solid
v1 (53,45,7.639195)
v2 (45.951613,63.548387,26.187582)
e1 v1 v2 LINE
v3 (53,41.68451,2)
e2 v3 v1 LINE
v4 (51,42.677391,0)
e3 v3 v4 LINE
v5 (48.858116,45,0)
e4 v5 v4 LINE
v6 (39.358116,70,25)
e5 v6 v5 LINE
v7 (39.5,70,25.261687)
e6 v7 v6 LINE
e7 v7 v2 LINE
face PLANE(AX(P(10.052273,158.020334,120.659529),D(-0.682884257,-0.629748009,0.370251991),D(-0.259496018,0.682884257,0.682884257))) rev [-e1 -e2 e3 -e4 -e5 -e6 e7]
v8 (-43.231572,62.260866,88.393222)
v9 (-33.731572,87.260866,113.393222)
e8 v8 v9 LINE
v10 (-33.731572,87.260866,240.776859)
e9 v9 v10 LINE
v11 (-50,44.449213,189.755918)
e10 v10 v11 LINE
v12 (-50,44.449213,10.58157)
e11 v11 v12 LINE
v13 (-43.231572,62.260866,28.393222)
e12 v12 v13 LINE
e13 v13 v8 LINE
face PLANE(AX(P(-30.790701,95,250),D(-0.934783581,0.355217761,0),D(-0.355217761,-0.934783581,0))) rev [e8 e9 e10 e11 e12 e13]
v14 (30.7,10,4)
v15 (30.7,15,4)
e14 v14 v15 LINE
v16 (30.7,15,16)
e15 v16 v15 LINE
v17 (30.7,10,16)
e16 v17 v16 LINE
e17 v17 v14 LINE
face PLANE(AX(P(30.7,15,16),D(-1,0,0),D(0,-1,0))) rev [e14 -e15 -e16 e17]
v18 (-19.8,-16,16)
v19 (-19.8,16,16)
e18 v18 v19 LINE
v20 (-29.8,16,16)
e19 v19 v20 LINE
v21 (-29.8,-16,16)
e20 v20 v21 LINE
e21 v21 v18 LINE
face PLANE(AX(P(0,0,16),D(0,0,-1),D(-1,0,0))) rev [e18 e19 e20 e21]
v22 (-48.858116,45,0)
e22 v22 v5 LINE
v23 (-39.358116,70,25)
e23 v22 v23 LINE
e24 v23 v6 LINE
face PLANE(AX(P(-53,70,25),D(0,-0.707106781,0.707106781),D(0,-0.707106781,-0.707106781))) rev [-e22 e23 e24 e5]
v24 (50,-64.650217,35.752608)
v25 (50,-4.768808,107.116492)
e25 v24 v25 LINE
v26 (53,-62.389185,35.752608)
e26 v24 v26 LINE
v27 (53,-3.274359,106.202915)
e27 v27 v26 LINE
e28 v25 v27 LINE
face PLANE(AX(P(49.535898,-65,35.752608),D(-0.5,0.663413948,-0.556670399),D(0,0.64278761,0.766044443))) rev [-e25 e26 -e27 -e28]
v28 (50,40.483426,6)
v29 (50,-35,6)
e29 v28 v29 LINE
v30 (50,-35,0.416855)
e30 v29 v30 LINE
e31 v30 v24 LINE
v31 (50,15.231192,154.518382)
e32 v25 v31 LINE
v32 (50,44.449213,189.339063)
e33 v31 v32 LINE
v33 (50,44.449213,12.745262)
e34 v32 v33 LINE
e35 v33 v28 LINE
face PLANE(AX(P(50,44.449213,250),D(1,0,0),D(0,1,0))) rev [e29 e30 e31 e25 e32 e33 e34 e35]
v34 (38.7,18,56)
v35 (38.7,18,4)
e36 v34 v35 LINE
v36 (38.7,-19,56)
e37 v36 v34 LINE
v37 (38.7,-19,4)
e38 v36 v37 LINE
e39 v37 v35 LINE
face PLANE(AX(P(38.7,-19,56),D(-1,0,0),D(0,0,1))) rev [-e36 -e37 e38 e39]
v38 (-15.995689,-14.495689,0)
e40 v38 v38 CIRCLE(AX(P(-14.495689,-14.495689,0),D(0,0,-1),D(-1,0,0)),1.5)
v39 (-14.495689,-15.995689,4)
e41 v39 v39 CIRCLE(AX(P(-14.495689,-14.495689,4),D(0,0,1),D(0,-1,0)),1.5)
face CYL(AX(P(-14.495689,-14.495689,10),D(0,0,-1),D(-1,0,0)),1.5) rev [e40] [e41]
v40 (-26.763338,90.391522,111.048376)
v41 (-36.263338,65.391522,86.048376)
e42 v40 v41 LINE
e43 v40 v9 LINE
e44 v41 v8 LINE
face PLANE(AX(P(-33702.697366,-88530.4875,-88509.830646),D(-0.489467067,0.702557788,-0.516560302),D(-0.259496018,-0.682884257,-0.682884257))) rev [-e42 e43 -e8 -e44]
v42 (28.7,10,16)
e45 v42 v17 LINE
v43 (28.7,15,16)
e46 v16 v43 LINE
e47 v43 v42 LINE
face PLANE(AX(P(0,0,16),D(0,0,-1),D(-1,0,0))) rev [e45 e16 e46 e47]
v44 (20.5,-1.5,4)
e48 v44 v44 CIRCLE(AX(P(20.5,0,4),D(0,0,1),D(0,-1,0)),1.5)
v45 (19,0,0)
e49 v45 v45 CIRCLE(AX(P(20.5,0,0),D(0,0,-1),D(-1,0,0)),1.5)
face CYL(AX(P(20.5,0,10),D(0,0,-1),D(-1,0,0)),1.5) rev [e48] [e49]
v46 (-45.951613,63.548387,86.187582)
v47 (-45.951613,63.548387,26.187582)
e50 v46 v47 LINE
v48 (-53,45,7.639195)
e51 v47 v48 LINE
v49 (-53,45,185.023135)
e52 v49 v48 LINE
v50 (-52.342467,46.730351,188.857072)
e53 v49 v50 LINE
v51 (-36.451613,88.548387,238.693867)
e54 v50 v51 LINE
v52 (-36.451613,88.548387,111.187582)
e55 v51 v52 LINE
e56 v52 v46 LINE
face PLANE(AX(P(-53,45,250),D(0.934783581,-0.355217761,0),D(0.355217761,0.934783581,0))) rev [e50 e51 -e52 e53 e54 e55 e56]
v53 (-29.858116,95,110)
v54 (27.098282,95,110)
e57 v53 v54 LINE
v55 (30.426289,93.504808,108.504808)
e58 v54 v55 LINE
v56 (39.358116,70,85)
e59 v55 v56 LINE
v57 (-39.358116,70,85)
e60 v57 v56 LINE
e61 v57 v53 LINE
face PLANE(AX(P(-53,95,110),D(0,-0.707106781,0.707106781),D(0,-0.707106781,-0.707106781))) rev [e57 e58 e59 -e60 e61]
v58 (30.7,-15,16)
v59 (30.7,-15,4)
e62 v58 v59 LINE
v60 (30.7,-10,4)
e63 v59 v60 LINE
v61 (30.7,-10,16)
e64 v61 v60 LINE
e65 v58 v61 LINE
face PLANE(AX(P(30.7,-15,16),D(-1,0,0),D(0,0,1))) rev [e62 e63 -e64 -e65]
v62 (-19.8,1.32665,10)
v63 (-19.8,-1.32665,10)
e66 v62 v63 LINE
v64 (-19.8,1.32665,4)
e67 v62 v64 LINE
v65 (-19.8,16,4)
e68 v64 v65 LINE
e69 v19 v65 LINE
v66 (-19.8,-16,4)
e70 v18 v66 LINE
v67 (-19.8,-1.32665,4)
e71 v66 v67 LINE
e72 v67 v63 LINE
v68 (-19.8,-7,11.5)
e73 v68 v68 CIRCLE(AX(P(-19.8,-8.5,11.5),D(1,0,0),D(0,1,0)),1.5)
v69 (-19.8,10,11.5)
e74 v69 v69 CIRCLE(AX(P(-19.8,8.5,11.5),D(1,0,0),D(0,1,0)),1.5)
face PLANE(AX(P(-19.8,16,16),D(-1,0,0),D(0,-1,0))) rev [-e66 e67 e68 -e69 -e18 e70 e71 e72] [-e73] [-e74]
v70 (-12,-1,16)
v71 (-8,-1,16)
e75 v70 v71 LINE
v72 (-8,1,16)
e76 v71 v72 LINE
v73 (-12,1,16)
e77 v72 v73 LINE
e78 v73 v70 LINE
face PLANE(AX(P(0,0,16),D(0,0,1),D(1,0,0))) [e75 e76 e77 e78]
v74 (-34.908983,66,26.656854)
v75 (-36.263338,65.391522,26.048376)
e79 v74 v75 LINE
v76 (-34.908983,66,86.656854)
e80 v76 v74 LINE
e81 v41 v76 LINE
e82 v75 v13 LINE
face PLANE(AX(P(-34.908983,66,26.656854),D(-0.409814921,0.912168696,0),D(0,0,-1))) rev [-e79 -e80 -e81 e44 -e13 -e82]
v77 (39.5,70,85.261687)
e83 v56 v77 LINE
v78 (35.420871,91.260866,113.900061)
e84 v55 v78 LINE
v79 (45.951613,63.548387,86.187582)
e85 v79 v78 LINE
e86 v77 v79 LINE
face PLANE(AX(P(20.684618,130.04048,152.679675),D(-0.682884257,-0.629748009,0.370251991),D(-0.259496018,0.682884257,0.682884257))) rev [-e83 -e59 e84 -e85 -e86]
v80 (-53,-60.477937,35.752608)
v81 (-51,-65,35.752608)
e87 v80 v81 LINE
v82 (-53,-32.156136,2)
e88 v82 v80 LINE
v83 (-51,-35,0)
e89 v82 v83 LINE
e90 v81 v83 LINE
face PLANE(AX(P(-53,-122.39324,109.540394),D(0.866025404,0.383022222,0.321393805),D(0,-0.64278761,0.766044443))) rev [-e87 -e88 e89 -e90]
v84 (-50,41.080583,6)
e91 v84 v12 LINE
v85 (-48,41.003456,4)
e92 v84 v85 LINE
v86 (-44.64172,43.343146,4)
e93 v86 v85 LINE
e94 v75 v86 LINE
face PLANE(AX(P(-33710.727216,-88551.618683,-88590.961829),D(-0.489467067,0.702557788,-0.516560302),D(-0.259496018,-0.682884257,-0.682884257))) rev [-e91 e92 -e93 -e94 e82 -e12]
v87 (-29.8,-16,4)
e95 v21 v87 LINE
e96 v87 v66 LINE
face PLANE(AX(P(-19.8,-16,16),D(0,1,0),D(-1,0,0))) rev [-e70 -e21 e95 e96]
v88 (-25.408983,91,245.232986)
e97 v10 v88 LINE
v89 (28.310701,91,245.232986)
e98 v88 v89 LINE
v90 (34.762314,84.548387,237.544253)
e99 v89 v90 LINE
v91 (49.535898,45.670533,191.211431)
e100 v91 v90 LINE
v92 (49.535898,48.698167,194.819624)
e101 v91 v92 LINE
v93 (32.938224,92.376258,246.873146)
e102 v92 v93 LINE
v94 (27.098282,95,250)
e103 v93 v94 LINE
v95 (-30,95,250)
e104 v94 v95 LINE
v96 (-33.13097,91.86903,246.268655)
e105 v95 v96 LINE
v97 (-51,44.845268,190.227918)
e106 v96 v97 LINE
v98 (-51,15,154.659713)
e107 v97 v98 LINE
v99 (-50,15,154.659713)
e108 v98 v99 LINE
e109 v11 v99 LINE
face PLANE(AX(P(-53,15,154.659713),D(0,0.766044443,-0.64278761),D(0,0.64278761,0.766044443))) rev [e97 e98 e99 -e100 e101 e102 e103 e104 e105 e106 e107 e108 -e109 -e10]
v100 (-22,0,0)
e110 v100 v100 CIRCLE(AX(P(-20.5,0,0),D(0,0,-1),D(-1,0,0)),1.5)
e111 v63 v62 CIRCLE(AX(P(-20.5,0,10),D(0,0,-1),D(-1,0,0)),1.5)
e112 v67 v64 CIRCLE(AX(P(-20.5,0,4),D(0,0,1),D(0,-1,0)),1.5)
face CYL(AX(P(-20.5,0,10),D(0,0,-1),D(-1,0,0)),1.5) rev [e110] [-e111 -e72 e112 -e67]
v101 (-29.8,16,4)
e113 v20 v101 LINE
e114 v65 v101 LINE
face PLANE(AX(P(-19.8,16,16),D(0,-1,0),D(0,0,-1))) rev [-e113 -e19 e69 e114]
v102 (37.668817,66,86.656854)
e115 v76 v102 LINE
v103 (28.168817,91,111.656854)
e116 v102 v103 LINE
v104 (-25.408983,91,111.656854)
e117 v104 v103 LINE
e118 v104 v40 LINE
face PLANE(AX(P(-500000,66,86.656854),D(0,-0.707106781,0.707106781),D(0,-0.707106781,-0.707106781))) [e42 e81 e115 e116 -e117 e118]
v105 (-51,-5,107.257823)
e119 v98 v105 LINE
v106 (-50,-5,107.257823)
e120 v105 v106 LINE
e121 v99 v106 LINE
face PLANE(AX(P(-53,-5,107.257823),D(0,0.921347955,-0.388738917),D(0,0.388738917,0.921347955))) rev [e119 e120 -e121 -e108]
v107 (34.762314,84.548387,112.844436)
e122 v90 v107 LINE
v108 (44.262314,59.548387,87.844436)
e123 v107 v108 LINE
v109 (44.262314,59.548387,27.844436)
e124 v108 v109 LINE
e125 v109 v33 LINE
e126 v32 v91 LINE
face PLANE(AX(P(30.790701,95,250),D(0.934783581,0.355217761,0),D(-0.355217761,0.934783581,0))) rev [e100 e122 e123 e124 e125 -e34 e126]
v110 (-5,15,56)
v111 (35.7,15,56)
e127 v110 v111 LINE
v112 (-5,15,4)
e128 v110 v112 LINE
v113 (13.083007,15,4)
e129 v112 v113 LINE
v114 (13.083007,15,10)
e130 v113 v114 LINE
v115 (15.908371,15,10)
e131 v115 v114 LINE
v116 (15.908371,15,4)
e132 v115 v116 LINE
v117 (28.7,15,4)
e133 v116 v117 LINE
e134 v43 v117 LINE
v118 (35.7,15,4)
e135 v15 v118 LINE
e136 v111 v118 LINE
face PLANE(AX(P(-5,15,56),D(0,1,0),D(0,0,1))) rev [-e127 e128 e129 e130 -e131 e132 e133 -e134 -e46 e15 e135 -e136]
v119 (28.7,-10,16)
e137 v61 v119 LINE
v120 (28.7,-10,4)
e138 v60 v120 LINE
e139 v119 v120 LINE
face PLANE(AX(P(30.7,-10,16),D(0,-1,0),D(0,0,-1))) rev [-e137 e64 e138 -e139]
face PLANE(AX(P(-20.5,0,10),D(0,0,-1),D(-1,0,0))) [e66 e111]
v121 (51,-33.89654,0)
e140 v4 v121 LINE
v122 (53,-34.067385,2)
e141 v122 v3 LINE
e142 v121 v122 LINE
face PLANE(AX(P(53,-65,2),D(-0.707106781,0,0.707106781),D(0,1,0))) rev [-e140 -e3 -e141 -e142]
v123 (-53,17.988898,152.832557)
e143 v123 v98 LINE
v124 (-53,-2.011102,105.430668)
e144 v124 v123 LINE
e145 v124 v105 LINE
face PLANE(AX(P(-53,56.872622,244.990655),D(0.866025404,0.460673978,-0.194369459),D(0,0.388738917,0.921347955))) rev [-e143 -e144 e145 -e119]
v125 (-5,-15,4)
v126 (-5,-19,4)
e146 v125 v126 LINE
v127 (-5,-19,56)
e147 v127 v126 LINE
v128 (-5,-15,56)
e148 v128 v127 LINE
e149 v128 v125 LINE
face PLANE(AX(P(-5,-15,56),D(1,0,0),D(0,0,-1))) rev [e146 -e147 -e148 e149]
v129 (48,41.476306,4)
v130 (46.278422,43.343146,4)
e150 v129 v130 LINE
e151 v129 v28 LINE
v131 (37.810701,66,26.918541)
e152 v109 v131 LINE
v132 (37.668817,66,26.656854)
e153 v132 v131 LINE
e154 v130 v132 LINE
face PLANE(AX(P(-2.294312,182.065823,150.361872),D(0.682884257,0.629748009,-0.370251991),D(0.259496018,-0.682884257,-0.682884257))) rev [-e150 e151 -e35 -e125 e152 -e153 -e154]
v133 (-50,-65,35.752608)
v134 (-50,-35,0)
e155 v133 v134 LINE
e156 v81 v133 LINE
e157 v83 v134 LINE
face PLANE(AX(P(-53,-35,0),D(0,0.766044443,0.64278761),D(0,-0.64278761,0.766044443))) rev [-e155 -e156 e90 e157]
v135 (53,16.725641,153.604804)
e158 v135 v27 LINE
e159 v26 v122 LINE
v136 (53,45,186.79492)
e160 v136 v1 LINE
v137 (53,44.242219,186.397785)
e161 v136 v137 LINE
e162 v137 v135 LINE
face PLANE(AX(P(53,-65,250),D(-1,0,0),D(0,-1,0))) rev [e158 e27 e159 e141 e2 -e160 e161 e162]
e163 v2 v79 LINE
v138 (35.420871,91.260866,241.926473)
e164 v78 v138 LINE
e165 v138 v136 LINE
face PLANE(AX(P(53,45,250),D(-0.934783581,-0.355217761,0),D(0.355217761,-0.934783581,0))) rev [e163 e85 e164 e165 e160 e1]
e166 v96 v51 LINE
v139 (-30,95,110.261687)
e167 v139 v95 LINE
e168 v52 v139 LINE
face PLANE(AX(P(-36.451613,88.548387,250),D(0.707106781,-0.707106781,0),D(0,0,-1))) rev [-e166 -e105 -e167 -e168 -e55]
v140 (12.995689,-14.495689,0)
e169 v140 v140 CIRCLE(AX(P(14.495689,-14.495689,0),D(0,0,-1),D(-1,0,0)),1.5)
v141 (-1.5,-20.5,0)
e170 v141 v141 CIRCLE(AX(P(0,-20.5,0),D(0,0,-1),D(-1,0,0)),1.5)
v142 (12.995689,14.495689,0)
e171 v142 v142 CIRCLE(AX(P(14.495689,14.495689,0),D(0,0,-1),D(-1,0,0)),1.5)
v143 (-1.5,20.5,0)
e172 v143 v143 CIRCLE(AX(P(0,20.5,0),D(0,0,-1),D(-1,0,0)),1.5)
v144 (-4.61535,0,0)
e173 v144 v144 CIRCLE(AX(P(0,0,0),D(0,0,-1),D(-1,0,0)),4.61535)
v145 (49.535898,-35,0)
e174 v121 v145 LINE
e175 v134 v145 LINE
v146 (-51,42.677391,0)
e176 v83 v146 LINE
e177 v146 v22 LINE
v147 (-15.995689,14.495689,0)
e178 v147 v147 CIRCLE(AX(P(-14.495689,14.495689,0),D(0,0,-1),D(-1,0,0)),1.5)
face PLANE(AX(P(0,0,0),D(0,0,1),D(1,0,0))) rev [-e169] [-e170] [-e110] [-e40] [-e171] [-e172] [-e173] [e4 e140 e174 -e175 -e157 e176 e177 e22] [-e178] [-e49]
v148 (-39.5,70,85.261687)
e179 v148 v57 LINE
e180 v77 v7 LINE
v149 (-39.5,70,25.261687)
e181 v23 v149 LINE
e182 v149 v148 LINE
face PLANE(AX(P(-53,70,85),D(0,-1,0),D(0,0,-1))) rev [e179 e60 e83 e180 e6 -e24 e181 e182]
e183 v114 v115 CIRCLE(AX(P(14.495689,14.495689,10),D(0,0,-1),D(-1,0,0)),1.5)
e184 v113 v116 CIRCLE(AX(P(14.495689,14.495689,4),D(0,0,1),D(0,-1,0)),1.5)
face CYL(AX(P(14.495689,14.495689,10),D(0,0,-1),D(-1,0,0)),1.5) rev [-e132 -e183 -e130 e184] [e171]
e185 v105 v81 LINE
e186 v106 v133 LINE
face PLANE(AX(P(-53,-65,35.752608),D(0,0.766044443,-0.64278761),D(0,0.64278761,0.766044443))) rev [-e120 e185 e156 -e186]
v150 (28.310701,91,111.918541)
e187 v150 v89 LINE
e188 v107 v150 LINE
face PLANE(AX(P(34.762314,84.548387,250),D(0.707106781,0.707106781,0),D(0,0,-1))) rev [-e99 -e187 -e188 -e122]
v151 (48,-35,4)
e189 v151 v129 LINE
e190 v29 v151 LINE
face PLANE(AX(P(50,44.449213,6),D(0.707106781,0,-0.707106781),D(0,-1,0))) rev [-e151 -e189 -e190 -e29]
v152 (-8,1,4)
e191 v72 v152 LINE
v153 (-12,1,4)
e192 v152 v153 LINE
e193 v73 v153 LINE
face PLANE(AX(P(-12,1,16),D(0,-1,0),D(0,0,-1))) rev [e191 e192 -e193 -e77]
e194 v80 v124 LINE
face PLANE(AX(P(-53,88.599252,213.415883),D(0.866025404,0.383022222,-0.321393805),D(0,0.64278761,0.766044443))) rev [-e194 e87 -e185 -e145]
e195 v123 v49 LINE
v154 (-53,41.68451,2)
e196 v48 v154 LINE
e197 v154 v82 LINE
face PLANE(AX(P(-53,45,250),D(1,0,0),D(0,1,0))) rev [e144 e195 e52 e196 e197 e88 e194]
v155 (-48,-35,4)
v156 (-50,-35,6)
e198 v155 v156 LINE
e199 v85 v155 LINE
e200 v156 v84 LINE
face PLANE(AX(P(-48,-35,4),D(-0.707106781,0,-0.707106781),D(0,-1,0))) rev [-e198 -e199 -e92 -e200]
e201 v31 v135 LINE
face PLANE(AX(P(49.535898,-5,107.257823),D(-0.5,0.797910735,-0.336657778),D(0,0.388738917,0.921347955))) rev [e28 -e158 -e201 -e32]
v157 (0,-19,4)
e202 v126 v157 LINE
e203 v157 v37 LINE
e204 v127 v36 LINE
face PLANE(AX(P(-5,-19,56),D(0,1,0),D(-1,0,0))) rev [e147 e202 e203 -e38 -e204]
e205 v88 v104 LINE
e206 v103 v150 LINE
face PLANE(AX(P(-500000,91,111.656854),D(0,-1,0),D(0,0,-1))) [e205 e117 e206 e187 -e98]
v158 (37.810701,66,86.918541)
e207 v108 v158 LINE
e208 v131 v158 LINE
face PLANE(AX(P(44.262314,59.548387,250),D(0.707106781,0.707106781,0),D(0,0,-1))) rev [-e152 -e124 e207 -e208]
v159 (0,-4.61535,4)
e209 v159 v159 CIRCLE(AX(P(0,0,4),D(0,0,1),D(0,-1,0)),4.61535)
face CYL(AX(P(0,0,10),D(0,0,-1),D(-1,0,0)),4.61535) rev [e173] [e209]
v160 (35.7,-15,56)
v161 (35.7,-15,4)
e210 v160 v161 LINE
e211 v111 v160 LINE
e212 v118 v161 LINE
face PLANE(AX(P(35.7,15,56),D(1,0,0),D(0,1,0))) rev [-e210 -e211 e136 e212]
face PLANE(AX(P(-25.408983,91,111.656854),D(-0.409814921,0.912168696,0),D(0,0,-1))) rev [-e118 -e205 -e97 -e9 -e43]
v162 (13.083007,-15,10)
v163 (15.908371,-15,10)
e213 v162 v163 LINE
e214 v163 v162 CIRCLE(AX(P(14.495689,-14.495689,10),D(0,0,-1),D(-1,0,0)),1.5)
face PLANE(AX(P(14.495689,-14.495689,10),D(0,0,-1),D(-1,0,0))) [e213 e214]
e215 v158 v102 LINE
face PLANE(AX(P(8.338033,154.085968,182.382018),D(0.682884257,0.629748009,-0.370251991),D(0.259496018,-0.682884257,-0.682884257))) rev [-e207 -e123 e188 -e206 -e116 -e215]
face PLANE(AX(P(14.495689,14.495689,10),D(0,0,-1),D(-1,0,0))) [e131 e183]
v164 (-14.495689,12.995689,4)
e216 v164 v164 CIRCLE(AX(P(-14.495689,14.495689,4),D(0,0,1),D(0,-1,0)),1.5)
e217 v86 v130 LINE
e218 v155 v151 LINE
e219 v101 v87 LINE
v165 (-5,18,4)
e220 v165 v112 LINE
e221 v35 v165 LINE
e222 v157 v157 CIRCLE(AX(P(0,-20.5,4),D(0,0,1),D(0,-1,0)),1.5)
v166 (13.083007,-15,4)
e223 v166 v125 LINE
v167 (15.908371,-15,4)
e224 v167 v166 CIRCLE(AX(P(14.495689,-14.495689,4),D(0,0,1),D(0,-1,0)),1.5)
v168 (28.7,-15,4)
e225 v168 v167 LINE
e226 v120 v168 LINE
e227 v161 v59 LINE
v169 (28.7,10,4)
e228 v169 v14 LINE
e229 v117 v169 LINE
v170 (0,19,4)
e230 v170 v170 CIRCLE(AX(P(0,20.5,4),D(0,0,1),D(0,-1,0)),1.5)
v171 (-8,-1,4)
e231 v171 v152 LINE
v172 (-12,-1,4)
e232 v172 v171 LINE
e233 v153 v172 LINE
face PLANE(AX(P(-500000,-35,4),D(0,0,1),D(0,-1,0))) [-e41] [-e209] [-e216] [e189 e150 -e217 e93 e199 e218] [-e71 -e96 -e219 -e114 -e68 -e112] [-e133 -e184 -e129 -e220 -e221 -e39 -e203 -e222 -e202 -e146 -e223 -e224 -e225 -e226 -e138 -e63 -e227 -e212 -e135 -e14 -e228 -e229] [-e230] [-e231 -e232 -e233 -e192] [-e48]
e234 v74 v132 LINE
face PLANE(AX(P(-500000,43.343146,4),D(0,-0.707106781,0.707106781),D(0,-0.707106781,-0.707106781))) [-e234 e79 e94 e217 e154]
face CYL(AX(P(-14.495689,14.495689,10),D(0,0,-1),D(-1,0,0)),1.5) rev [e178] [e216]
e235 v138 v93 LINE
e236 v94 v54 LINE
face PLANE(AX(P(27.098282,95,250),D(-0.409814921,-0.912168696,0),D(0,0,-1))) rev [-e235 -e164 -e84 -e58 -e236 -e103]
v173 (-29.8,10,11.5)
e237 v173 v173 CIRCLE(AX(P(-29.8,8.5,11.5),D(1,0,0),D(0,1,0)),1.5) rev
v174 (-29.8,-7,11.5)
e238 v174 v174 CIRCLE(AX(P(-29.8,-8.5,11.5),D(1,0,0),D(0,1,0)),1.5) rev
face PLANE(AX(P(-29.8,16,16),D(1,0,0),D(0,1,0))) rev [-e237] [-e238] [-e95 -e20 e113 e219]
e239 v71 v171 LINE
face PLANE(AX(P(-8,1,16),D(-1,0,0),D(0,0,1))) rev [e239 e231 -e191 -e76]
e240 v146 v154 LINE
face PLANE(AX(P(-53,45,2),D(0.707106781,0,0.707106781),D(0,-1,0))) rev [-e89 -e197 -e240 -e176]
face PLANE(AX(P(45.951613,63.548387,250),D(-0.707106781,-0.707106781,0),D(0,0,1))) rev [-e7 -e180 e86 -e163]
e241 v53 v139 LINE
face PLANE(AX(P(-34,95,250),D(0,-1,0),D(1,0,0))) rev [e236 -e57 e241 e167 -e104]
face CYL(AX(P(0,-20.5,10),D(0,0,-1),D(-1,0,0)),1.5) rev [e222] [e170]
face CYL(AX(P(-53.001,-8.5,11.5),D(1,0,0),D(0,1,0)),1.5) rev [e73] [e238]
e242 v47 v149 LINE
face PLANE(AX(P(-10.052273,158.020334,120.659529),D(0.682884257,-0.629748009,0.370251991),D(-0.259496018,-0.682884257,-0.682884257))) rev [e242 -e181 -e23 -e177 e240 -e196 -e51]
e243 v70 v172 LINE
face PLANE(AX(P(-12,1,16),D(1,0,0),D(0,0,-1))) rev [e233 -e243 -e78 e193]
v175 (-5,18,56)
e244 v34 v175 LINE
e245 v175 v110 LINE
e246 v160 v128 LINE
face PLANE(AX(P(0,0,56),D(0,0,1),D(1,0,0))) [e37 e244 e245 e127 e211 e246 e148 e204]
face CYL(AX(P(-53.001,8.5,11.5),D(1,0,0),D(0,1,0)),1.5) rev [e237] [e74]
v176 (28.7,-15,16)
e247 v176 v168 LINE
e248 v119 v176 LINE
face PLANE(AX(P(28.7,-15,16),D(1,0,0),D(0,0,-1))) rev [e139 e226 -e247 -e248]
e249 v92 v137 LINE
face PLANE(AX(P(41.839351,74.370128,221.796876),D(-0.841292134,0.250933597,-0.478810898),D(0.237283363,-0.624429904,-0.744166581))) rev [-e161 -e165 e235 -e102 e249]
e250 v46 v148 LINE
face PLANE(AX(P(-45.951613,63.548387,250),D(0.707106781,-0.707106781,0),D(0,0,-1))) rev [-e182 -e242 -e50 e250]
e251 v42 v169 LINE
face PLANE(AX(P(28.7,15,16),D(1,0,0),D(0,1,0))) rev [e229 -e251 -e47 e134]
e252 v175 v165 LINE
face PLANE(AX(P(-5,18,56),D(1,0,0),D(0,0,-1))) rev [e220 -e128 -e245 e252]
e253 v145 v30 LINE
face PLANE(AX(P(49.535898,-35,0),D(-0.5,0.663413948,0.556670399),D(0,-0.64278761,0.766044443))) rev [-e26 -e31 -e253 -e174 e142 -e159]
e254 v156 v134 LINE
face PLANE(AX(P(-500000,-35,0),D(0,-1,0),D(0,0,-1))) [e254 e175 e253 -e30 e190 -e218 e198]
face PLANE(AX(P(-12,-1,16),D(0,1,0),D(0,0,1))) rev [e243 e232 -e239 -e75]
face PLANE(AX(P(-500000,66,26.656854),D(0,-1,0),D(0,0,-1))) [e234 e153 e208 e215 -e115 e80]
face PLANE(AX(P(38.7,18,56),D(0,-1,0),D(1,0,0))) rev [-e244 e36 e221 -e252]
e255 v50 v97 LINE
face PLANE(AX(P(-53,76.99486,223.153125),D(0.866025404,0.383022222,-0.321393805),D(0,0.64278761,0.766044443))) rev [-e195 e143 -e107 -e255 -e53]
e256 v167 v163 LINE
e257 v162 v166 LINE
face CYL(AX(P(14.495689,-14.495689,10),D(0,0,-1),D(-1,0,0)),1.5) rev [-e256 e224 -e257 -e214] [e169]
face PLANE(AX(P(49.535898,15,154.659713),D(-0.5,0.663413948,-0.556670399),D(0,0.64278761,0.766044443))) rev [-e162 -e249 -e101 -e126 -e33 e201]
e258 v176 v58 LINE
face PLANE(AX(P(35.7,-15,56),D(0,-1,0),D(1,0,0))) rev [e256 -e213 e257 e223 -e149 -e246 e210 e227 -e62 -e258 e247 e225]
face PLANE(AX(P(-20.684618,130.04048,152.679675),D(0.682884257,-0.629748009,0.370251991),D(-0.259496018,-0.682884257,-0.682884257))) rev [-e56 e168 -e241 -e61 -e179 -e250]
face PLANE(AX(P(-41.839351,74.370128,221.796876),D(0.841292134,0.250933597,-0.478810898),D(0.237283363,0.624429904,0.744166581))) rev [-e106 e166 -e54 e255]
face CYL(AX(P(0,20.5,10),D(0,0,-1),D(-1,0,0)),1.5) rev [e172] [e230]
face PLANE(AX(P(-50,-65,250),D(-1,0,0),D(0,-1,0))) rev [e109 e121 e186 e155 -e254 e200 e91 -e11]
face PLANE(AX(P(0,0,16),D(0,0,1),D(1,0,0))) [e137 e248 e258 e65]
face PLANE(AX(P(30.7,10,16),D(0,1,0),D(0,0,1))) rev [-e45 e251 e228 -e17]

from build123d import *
from OCP.BRepFilletAPI import BRepFilletAPI_MakeChamfer

# Parameters (mm, degrees)
EXTRUDE_1_DEPTH          = 250
EXTRUDE_1_2_DEPTH        = 250
CUT_EXTRUDE_1_DEPTH      = 273.642623227
CUT_EXTRUDE_1_DEPTH_BACK = 273.642623227
EXTRUDE_5_REACH          = 274.643
EXTRUDE_6_REACH          = 274.643
EXTRUDE_13_DEPTH         = 52
SKETCH_15_W              = 2
SKETCH_15_H              = 5
SKETCH_15_W_2            = 4
SKETCH_15_H_2            = 2
EXTRUDE_14_DEPTH         = 12
SKETCH_16_W              = 10
SKETCH_16_H              = 32
EXTRUDE_15_DEPTH         = 12
CUT_EXTRUDE_2_REACH      = 279.173
SKETCH_17_R              = 1.5
SKETCH_18_R              = 1.5
SKETCH_18_R_2            = 4.615350253
CUT_EXTRUDE_3_DEPTH      = 10
CHAMFER_1_SIZE           = 3.464101615
CHAMFER_1_SIZE_2         = 2
CHAMFER_1_SIZE_3         = 2.416402179
CHAMFER_2_SIZE           = 4
CHAMFER_2_SIZE2          = 5.580634967
CHAMFER_2_SIZE2_2        = 6.901718256
CHAMFER_4_SIZE           = 2


with BuildPart() as part:
    # 草图2 → 凸台-拉伸1 (new body)
    with BuildSketch(Plane.XY):
        Polygon((-53, 45), (-34, 95), (-30.790701011, 95), (-50, 44.449213187), (-50, -65), (-53, -65), align=None)
    extrude(amount=EXTRUDE_1_DEPTH)


with BuildPart() as body_2:
    # 草图2 → Extrude 1 2 (new body)
    with BuildSketch(Plane.XY):
        Polygon((50, 44.449213187), (50, -65), (53, -65), (53, 45), (34, 95), (30.790701011, 95), align=None)
    extrude(amount=EXTRUDE_1_2_DEPTH)


with BuildPart() as cut_extrude_1_tool:
    # 草图3 → 切除-拉伸1 (new, two sides: drawn at the far end of the back side and taken through both)
    with BuildSketch(Plane(origin=(0, 0, 0), x_dir=(0, 0, -1), z_dir=(1, 0, 0)).offset(-CUT_EXTRUDE_1_DEPTH_BACK)):
        Polygon((0, -35), (-35.752607778, -65), (-107.257823333, -5), (-154.659712592, 15), (-250, 95), (-250, -65), (-250, -69.557889813), (0, -69.557889813), (0, -65), align=None)
        Polygon((-110, 95), (-85, 70), (-25, 70), (0, 45), (0, 95), align=None)
    extrude(amount=CUT_EXTRUDE_1_DEPTH + CUT_EXTRUDE_1_DEPTH_BACK)


with BuildPart() as part_1:
    add(part.part)

    # 切除-拉伸1: cut by cut_extrude_1_tool
    add(cut_extrude_1_tool.part, mode=Mode.SUBTRACT)

    # 草图5<2> → 凸台-拉伸6 (add, up to next)
    with BuildSketch(Plane(origin=(0, 0, 0), x_dir=(0, 0, -1), z_dir=(1, 0, 0)), mode=Mode.PRIVATE) as extrude_6_sk1:
        Polygon((-250, 95), (-110, 95), (-85, 70), (-25, 70), (0, 45), (0, -35), (-4, -35), (-4, 43.343145751), (-26.656854249, 66), (-86.656854249, 66), (-111.656854249, 91), (-245.23298563, 91), align=None)
    extrude_6_tool1 = extrude(extrude_6_sk1.sketch, amount=-EXTRUDE_6_REACH, mode=Mode.PRIVATE) - part_1.part


with BuildPart() as body_2_1:
    add(body_2.part)

    # 切除-拉伸1: cut by cut_extrude_1_tool
    add(cut_extrude_1_tool.part, mode=Mode.SUBTRACT)

    # 草图5 → 凸台-拉伸5 (add, up to next)
    with BuildSketch(Plane(origin=(0, 0, 0), x_dir=(0, 0, -1), z_dir=(1, 0, 0)), mode=Mode.PRIVATE) as extrude_5_sk1:
        Polygon((-250, 95), (-110, 95), (-85, 70), (-25, 70), (0, 45), (0, -35), (-4, -35), (-4, 43.343145751), (-26.656854249, 66), (-86.656854249, 66), (-111.656854249, 91), (-245.23298563, 91), align=None)
    extrude_5_tool1 = extrude(extrude_5_sk1.sketch, amount=EXTRUDE_5_REACH, mode=Mode.PRIVATE) - body_2_1.part
    add(extrude_5_tool1.solids().sort_by_distance((0, 92.182199, 180))[0])


with BuildPart() as part_2:
    add(part_1.part)

    add(body_2_1.part)  # 凸台-拉伸6 merges body 2
    add(extrude_6_tool1.solids().sort_by_distance((0, 92.182199, 180))[0])

    # 草图13 → 凸台-拉伸13 (add)
    with BuildSketch(Plane.XY.offset(4)):
        Polygon((-5, 15), (35.7, 15), (35.7, -15), (-5, -15), (-5, -19), (38.7, -19), (38.7, 18), (-5, 18), align=None)
    extrude(amount=EXTRUDE_13_DEPTH)

    # 草图15 → 凸台-拉伸14 (add)
    with BuildSketch(Plane.XY.offset(4)):
        with Locations((29.7, 12.5)):
            Rectangle(SKETCH_15_W, SKETCH_15_H)
        with Locations((29.7, -12.5)):
            Rectangle(SKETCH_15_W, SKETCH_15_H)
        with Locations((-10, 0)):
            Rectangle(SKETCH_15_W_2, SKETCH_15_H_2)
    extrude(amount=EXTRUDE_14_DEPTH)

    # 草图16 → 凸台-拉伸15 (add)
    with BuildSketch(Plane.XY.offset(4)):
        with Locations((-24.8, 0)):
            Rectangle(SKETCH_16_W, SKETCH_16_H)
    extrude(amount=EXTRUDE_15_DEPTH)

    # 草图17 → 切除-拉伸2 (cut, up to next)
    with BuildSketch(Plane(origin=(-19.8, 0, 0), x_dir=(0, 0, -1), z_dir=(1, 0, 0)), mode=Mode.PRIVATE) as cut_extrude_2_sk1:
        with Locations(Location((-11.5, 8.5, 0), (0, 0, 90))):
            Circle(SKETCH_17_R)
    cut_extrude_2_tool1 = extrude(cut_extrude_2_sk1.sketch, amount=-CUT_EXTRUDE_2_REACH, mode=Mode.PRIVATE) & part_2.part
    # 草图17 → 切除-拉伸2 (cut, up to next)
    with BuildSketch(Plane(origin=(-19.8, 0, 0), x_dir=(0, 0, -1), z_dir=(1, 0, 0)), mode=Mode.PRIVATE) as cut_extrude_2_sk2:
        with Locations(Location((-11.5, -8.5, 0), (0, 0, 90))):
            Circle(SKETCH_17_R)
    cut_extrude_2_tool2 = extrude(cut_extrude_2_sk2.sketch, amount=-CUT_EXTRUDE_2_REACH, mode=Mode.PRIVATE) & part_2.part
    add(cut_extrude_2_tool1.solids().sort_by_distance((-19.8, 8.5, 11.5))[0], mode=Mode.SUBTRACT)
    add(cut_extrude_2_tool2.solids().sort_by_distance((-19.8, -8.5, 11.5))[0], mode=Mode.SUBTRACT)

    # 草图18 → 切除-拉伸3 (cut)
    with BuildSketch(Plane(origin=(0, 0, 0), x_dir=(-1, 0, 0), z_dir=(0, 0, -1))):
        with Locations((20.5, 0)):
            Circle(SKETCH_18_R)
        with Locations((14.495689014, -14.495689014)):
            Circle(SKETCH_18_R)
        with Locations((0, -20.5)):
            Circle(SKETCH_18_R)
        with Locations((-14.495689014, -14.495689014)):
            Circle(SKETCH_18_R)
        with Locations((-20.5, 0)):
            Circle(SKETCH_18_R)
        with Locations((-14.495689014, 14.495689014)):
            Circle(SKETCH_18_R)
        with Locations((0, 20.5)):
            Circle(SKETCH_18_R)
        with Locations((14.495689014, 14.495689014)):
            Circle(SKETCH_18_R)
        Circle(SKETCH_18_R_2)
    extrude(amount=-CUT_EXTRUDE_3_DEPTH, mode=Mode.SUBTRACT)

    # 倒角1
    # the kernel refuses this chamfer: 3.464101615, 2.416402179, 2 mm, written as the material it takes off along each edge
    with BuildSketch(Plane(origin=(53, 9.239383761, 147.794477493), x_dir=(-1, 0, 0), z_dir=(0, 0.6427876096865404, 0.7660444431189771))) as chamfer_1_piece_1:
        Polygon((CHAMFER_1_SIZE, 0), (0, -CHAMFER_1_SIZE_2), (0, 0), align=None)
    extrude(amount=70.868920247, mode=Mode.SUBTRACT)
    with BuildSketch(Plane(origin=(53, -8.483850163, 99.000769351), x_dir=(-3.552713678800504e-15, 0.9213479550614352, -0.38873891714634334), z_dir=(0, 0.38873891714634334, 0.9213479550614352))) as chamfer_1_piece_2_section:
        Polygon((CHAMFER_1_SIZE_2, 0), (0, CHAMFER_1_SIZE), (0, 0), align=None)
    chamfer_1_piece_2 = extrude(amount=69.37226796, mode=Mode.PRIVATE)
    chamfer_1_piece_2 = split(chamfer_1_piece_2, bisect_by=Plane(origin=(53.276585969, -8.850832142, 99.308703795), z_dir=(0.49999999999999917, -0.663413948168938, 0.5566703992264205)), keep=Keep.TOP, mode=Mode.PRIVATE)
    add(chamfer_1_piece_2, mode=Mode.SUBTRACT)
    with BuildSketch(Plane(origin=(53, -70.760616239, 28.887372679), x_dir=(-3.5527136788004907e-15, 0.7660444431189773, -0.6427876096865404), z_dir=(0, 0.6427876096865404, 0.7660444431189772))) as chamfer_1_piece_3_section:
        Polygon((CHAMFER_1_SIZE_2, 0), (0, CHAMFER_1_SIZE), (0, 0), align=None)
    chamfer_1_piece_3 = extrude(amount=111.267285494, mode=Mode.PRIVATE)
    chamfer_1_piece_3 = split(chamfer_1_piece_3, bisect_by=Plane(origin=(39.090434661, -48.563433238, 19.521845967), z_dir=(0.49999999999999994, -0.7979107348080464, 0.33665777768838756)), keep=Keep.TOP, mode=Mode.PRIVATE)
    add(chamfer_1_piece_3, mode=Mode.SUBTRACT)
    with BuildSketch(Plane(origin=(53, -29.239383761, -6.865235099), x_dir=(0, 0.766044443118976, 0.6427876096865418), z_dir=(0, -0.6427876096865418, 0.766044443118976))) as chamfer_1_piece_4:
        Polygon((CHAMFER_1_SIZE_2, 0), (0, CHAMFER_1_SIZE), (0, 0), align=None)
    extrude(amount=64.595570688, mode=Mode.SUBTRACT)
    with BuildSketch(Plane(origin=(-53, 5.206952393, 142.988812924), x_dir=(1, 0, 0), z_dir=(0, 0.6427876096865404, 0.7660444431189771))) as chamfer_1_piece_5:
        Polygon((CHAMFER_1_SIZE_2, 0), (0, CHAMFER_1_SIZE), (0, 0), align=None)
    extrude(amount=70.868920247, mode=Mode.SUBTRACT)
    with BuildSketch(Plane(origin=(-53, -8.483850163, 99.000769351), x_dir=(0, 0.9213479550614352, -0.3887389171463434), z_dir=(0, 0.38873891714634334, 0.9213479550614352))) as chamfer_1_piece_6_section:
        Polygon((CHAMFER_1_SIZE, 0), (0, -CHAMFER_1_SIZE_2), (0, 0), align=None)
    chamfer_1_piece_6 = extrude(amount=75.645617519, mode=Mode.PRIVATE)
    chamfer_1_piece_6 = split(chamfer_1_piece_6, bisect_by=Plane(origin=(-52.642611372, -8.325785763, 98.868137571), z_dir=(-0.8660254037844394, -0.3830222215594882, 0.3213938048432697)), keep=Keep.TOP, mode=Mode.PRIVATE)
    add(chamfer_1_piece_6, mode=Mode.SUBTRACT)
    with BuildSketch(Plane(origin=(-53, -70.760616239, 28.887372679), x_dir=(0, 0.7660444431189772, -0.6427876096865404), z_dir=(0, 0.6427876096865404, 0.7660444431189772))) as chamfer_1_piece_7_section:
        Polygon((CHAMFER_1_SIZE, 0), (0, -CHAMFER_1_SIZE_2), (0, 0), align=None)
    chamfer_1_piece_7 = extrude(amount=111.267285494, mode=Mode.PRIVATE)
    chamfer_1_piece_7 = split(chamfer_1_piece_7, bisect_by=Plane(origin=(-38.456460064, -63.024318482, 25.623242123), z_dir=(-0.8660254037844407, -0.4606739775307143, 0.1943694585731703)), keep=Keep.TOP, mode=Mode.PRIVATE)
    add(chamfer_1_piece_7, mode=Mode.SUBTRACT)
    with BuildSketch(Plane(origin=(-53, -29.239383761, -6.865235099), x_dir=(0, 0.766044443118976, 0.6427876096865417), z_dir=(0, -0.6427876096865418, 0.766044443118976))) as chamfer_1_piece_8:
        Polygon((CHAMFER_1_SIZE, 0), (0, -CHAMFER_1_SIZE_2), (0, 0), align=None)
    extrude(amount=64.595570688, mode=Mode.SUBTRACT)
    # the kernel refuses this chamfer: 3.464101615, 2.416402179, 2 mm, written as the material it takes off along each edge
    with BuildSketch(Plane(origin=(56.90581755, 34.721532764, 178.162920115), x_dir=(-0.9714404796101728, -0.15252280601661522, -0.1817696020229335), z_dir=(-0.2372833634597202, 0.6244299038413693, 0.7441665812262069))) as chamfer_1_2_piece_1:
        Polygon((CHAMFER_1_SIZE_2, 0), (CHAMFER_1_SIZE_3 * 0.272112591588, -CHAMFER_1_SIZE_3 * 0.962265419331), (0, 0), align=None)
    extrude(amount=102.745515014, mode=Mode.SUBTRACT)
    with BuildSketch(Plane(origin=(-53.505772516, 43.669019695, 188.82611981), x_dir=(0.9714404796101727, -0.15252280601661541, -0.1817696020229337), z_dir=(0.23728336345972048, 0.6244299038413692, 0.7441665812262068))) as chamfer_1_2_piece_2:
        Polygon((CHAMFER_1_SIZE_2, 0), (CHAMFER_1_SIZE_3 * 0.272112591588, CHAMFER_1_SIZE_3 * 0.962265419331), (0, 0), align=None)
    extrude(amount=88.416465626, mode=Mode.SUBTRACT)

    # 倒角2: one chamfer whose edges measure the first distance from different faces: ONE call of the kernel's chamfer builder (chamfer() names one face for all edges)
    chamfer_2_edges_1 = [part_2.edges().sort_by_distance(p)[0] for p in [
        (45.905350506, 55.224606594, 15.881460843),
    ]]
    chamfer_2_side_1 = [part_2.faces().sort_by_distance(p)[0] for p in [
        (0, 54.321436841, 14.97829109),
    ]]
    chamfer_2_edges_2 = [part_2.edges().sort_by_distance(p)[0] for p in [
        (-45.905350506, 55.224606594, 15.881460843),
        (-37.060701011, 78.5, 99.156854249),
    ]]
    chamfer_2_side_2 = [part_2.faces().sort_by_distance(p)[0] for p in [
        (-41.912460378, 65.732212193, 134.225656141),
    ]]
    chamfer_2_edges_3 = [part_2.edges().sort_by_distance(p)[0] for p in [
        (41.810701011, 66, 56.656854249),
    ]]
    chamfer_2_side_3 = [part_2.faces().sort_by_distance(p)[0] for p in [
        (0, 66, 56.656854249),
    ]]
    chamfer_2_edges_4 = [part_2.edges().sort_by_distance(p)[0] for p in [
        (-41.810701011, 66, 56.656854249),
        (-32.310701011, 91, 178.44491994),
    ]]
    chamfer_2_side_4 = [part_2.faces().sort_by_distance(p)[0] for p in [
        (-41.912460378, 65.732212193, 134.225656141),
    ]]
    chamfer_2_edges_5 = [part_2.edges().sort_by_distance(p)[0] for p in [
        (37.060701011, 78.5, 99.156854249),
    ]]
    chamfer_2_side_5 = [part_2.faces().sort_by_distance(p)[0] for p in [
        (0, 77.965966209, 98.622820458),
    ]]
    chamfer_2_edges_6 = [part_2.edges().sort_by_distance(p)[0] for p in [
        (32.310701011, 91, 178.44491994),
    ]]
    chamfer_2_side_6 = [part_2.faces().sort_by_distance(p)[0] for p in [
        (0, 91, 178.44491994),
    ]]
    chamfer_2_edges_7 = [part_2.edges().sort_by_distance(p)[0] for p in [
        (-48.25, 57.5, 12.5),
        (48.25, 57.5, 12.5),
    ]]
    chamfer_2_side_7 = [part_2.faces().sort_by_distance(p)[0] for p in [
        (0, 57.089810017, 12.089810017),
    ]]
    chamfer_2_edges_8 = [part_2.edges().sort_by_distance(p)[0] for p in [
        (-43.5, 70, 55),
        (43.5, 70, 55),
    ]]
    chamfer_2_side_8 = [part_2.faces().sort_by_distance(p)[0] for p in [
        (0, 70, 55),
    ]]
    chamfer_2_edges_9 = [part_2.edges().sort_by_distance(p)[0] for p in [
        (-38.75, 82.5, 97.5),
        (38.75, 82.5, 97.5),
    ]]
    chamfer_2_side_9 = [part_2.faces().sort_by_distance(p)[0] for p in [
        (0, 81.989247312, 96.989247312),
    ]]
    chamfer_2_edges_10 = [part_2.edges().sort_by_distance(p)[0] for p in [
        (-34, 95, 178.191299722),
    ]]
    chamfer_2_side_10 = [part_2.faces().sort_by_distance(p)[0] for p in [
        (0, 95, 179.946140148),
    ]]
    chamfer_2_edges_11 = [part_2.edges().sort_by_distance(p)[0] for p in [
        (34, 95, 178.191299722),
    ]]
    chamfer_2_side_11 = [part_2.faces().sort_by_distance(p)[0] for p in [
        (44.287923043, 67.926518307, 130.959754024),
    ]]
    chamfer_2 = BRepFilletAPI_MakeChamfer(part_2.part.solid().wrapped)
    for e in chamfer_2_edges_1:
        chamfer_2.Add(CHAMFER_2_SIZE, CHAMFER_2_SIZE2, e.wrapped, chamfer_2_side_1[0].wrapped)  # the first distance lies on this face
    for e in chamfer_2_edges_2:
        chamfer_2.Add(CHAMFER_2_SIZE, CHAMFER_2_SIZE2, e.wrapped, chamfer_2_side_2[0].wrapped)  # the first distance lies on this face
    for e in chamfer_2_edges_3:
        chamfer_2.Add(CHAMFER_2_SIZE, CHAMFER_2_SIZE2_2, e.wrapped, chamfer_2_side_3[0].wrapped)  # the first distance lies on this face
    for e in chamfer_2_edges_4:
        chamfer_2.Add(CHAMFER_2_SIZE, CHAMFER_2_SIZE2_2, e.wrapped, chamfer_2_side_4[0].wrapped)  # the first distance lies on this face
    for e in chamfer_2_edges_5:
        chamfer_2.Add(CHAMFER_2_SIZE, CHAMFER_2_SIZE2, e.wrapped, chamfer_2_side_5[0].wrapped)  # the first distance lies on this face
    for e in chamfer_2_edges_6:
        chamfer_2.Add(CHAMFER_2_SIZE, CHAMFER_2_SIZE2_2, e.wrapped, chamfer_2_side_6[0].wrapped)  # the first distance lies on this face
    for e in chamfer_2_edges_7:
        chamfer_2.Add(CHAMFER_2_SIZE, CHAMFER_2_SIZE2, e.wrapped, chamfer_2_side_7[0].wrapped)  # the first distance lies on this face
    for e in chamfer_2_edges_8:
        chamfer_2.Add(CHAMFER_2_SIZE, CHAMFER_2_SIZE2_2, e.wrapped, chamfer_2_side_8[0].wrapped)  # the first distance lies on this face
    for e in chamfer_2_edges_9:
        chamfer_2.Add(CHAMFER_2_SIZE, CHAMFER_2_SIZE2, e.wrapped, chamfer_2_side_9[0].wrapped)  # the first distance lies on this face
    for e in chamfer_2_edges_10:
        chamfer_2.Add(CHAMFER_2_SIZE, CHAMFER_2_SIZE2_2, e.wrapped, chamfer_2_side_10[0].wrapped)  # the first distance lies on this face
    for e in chamfer_2_edges_11:
        chamfer_2.Add(CHAMFER_2_SIZE, CHAMFER_2_SIZE2_2, e.wrapped, chamfer_2_side_11[0].wrapped)  # the first distance lies on this face
    add(Compound.cast(chamfer_2.Shape()), mode=Mode.REPLACE)

    # 倒角4
    chamfer_4_edges = [part_2.edges().sort_by_distance(p)[0] for p in [
        (-50, 2.305035055, 4),
        (50, 2.153776079, 4),
        (-53, 5.015350076, 0),
        (53, 4.059725616, 0),
    ]]
    chamfer(chamfer_4_edges, length=CHAMFER_4_SIZE)


solid = part_2.part
